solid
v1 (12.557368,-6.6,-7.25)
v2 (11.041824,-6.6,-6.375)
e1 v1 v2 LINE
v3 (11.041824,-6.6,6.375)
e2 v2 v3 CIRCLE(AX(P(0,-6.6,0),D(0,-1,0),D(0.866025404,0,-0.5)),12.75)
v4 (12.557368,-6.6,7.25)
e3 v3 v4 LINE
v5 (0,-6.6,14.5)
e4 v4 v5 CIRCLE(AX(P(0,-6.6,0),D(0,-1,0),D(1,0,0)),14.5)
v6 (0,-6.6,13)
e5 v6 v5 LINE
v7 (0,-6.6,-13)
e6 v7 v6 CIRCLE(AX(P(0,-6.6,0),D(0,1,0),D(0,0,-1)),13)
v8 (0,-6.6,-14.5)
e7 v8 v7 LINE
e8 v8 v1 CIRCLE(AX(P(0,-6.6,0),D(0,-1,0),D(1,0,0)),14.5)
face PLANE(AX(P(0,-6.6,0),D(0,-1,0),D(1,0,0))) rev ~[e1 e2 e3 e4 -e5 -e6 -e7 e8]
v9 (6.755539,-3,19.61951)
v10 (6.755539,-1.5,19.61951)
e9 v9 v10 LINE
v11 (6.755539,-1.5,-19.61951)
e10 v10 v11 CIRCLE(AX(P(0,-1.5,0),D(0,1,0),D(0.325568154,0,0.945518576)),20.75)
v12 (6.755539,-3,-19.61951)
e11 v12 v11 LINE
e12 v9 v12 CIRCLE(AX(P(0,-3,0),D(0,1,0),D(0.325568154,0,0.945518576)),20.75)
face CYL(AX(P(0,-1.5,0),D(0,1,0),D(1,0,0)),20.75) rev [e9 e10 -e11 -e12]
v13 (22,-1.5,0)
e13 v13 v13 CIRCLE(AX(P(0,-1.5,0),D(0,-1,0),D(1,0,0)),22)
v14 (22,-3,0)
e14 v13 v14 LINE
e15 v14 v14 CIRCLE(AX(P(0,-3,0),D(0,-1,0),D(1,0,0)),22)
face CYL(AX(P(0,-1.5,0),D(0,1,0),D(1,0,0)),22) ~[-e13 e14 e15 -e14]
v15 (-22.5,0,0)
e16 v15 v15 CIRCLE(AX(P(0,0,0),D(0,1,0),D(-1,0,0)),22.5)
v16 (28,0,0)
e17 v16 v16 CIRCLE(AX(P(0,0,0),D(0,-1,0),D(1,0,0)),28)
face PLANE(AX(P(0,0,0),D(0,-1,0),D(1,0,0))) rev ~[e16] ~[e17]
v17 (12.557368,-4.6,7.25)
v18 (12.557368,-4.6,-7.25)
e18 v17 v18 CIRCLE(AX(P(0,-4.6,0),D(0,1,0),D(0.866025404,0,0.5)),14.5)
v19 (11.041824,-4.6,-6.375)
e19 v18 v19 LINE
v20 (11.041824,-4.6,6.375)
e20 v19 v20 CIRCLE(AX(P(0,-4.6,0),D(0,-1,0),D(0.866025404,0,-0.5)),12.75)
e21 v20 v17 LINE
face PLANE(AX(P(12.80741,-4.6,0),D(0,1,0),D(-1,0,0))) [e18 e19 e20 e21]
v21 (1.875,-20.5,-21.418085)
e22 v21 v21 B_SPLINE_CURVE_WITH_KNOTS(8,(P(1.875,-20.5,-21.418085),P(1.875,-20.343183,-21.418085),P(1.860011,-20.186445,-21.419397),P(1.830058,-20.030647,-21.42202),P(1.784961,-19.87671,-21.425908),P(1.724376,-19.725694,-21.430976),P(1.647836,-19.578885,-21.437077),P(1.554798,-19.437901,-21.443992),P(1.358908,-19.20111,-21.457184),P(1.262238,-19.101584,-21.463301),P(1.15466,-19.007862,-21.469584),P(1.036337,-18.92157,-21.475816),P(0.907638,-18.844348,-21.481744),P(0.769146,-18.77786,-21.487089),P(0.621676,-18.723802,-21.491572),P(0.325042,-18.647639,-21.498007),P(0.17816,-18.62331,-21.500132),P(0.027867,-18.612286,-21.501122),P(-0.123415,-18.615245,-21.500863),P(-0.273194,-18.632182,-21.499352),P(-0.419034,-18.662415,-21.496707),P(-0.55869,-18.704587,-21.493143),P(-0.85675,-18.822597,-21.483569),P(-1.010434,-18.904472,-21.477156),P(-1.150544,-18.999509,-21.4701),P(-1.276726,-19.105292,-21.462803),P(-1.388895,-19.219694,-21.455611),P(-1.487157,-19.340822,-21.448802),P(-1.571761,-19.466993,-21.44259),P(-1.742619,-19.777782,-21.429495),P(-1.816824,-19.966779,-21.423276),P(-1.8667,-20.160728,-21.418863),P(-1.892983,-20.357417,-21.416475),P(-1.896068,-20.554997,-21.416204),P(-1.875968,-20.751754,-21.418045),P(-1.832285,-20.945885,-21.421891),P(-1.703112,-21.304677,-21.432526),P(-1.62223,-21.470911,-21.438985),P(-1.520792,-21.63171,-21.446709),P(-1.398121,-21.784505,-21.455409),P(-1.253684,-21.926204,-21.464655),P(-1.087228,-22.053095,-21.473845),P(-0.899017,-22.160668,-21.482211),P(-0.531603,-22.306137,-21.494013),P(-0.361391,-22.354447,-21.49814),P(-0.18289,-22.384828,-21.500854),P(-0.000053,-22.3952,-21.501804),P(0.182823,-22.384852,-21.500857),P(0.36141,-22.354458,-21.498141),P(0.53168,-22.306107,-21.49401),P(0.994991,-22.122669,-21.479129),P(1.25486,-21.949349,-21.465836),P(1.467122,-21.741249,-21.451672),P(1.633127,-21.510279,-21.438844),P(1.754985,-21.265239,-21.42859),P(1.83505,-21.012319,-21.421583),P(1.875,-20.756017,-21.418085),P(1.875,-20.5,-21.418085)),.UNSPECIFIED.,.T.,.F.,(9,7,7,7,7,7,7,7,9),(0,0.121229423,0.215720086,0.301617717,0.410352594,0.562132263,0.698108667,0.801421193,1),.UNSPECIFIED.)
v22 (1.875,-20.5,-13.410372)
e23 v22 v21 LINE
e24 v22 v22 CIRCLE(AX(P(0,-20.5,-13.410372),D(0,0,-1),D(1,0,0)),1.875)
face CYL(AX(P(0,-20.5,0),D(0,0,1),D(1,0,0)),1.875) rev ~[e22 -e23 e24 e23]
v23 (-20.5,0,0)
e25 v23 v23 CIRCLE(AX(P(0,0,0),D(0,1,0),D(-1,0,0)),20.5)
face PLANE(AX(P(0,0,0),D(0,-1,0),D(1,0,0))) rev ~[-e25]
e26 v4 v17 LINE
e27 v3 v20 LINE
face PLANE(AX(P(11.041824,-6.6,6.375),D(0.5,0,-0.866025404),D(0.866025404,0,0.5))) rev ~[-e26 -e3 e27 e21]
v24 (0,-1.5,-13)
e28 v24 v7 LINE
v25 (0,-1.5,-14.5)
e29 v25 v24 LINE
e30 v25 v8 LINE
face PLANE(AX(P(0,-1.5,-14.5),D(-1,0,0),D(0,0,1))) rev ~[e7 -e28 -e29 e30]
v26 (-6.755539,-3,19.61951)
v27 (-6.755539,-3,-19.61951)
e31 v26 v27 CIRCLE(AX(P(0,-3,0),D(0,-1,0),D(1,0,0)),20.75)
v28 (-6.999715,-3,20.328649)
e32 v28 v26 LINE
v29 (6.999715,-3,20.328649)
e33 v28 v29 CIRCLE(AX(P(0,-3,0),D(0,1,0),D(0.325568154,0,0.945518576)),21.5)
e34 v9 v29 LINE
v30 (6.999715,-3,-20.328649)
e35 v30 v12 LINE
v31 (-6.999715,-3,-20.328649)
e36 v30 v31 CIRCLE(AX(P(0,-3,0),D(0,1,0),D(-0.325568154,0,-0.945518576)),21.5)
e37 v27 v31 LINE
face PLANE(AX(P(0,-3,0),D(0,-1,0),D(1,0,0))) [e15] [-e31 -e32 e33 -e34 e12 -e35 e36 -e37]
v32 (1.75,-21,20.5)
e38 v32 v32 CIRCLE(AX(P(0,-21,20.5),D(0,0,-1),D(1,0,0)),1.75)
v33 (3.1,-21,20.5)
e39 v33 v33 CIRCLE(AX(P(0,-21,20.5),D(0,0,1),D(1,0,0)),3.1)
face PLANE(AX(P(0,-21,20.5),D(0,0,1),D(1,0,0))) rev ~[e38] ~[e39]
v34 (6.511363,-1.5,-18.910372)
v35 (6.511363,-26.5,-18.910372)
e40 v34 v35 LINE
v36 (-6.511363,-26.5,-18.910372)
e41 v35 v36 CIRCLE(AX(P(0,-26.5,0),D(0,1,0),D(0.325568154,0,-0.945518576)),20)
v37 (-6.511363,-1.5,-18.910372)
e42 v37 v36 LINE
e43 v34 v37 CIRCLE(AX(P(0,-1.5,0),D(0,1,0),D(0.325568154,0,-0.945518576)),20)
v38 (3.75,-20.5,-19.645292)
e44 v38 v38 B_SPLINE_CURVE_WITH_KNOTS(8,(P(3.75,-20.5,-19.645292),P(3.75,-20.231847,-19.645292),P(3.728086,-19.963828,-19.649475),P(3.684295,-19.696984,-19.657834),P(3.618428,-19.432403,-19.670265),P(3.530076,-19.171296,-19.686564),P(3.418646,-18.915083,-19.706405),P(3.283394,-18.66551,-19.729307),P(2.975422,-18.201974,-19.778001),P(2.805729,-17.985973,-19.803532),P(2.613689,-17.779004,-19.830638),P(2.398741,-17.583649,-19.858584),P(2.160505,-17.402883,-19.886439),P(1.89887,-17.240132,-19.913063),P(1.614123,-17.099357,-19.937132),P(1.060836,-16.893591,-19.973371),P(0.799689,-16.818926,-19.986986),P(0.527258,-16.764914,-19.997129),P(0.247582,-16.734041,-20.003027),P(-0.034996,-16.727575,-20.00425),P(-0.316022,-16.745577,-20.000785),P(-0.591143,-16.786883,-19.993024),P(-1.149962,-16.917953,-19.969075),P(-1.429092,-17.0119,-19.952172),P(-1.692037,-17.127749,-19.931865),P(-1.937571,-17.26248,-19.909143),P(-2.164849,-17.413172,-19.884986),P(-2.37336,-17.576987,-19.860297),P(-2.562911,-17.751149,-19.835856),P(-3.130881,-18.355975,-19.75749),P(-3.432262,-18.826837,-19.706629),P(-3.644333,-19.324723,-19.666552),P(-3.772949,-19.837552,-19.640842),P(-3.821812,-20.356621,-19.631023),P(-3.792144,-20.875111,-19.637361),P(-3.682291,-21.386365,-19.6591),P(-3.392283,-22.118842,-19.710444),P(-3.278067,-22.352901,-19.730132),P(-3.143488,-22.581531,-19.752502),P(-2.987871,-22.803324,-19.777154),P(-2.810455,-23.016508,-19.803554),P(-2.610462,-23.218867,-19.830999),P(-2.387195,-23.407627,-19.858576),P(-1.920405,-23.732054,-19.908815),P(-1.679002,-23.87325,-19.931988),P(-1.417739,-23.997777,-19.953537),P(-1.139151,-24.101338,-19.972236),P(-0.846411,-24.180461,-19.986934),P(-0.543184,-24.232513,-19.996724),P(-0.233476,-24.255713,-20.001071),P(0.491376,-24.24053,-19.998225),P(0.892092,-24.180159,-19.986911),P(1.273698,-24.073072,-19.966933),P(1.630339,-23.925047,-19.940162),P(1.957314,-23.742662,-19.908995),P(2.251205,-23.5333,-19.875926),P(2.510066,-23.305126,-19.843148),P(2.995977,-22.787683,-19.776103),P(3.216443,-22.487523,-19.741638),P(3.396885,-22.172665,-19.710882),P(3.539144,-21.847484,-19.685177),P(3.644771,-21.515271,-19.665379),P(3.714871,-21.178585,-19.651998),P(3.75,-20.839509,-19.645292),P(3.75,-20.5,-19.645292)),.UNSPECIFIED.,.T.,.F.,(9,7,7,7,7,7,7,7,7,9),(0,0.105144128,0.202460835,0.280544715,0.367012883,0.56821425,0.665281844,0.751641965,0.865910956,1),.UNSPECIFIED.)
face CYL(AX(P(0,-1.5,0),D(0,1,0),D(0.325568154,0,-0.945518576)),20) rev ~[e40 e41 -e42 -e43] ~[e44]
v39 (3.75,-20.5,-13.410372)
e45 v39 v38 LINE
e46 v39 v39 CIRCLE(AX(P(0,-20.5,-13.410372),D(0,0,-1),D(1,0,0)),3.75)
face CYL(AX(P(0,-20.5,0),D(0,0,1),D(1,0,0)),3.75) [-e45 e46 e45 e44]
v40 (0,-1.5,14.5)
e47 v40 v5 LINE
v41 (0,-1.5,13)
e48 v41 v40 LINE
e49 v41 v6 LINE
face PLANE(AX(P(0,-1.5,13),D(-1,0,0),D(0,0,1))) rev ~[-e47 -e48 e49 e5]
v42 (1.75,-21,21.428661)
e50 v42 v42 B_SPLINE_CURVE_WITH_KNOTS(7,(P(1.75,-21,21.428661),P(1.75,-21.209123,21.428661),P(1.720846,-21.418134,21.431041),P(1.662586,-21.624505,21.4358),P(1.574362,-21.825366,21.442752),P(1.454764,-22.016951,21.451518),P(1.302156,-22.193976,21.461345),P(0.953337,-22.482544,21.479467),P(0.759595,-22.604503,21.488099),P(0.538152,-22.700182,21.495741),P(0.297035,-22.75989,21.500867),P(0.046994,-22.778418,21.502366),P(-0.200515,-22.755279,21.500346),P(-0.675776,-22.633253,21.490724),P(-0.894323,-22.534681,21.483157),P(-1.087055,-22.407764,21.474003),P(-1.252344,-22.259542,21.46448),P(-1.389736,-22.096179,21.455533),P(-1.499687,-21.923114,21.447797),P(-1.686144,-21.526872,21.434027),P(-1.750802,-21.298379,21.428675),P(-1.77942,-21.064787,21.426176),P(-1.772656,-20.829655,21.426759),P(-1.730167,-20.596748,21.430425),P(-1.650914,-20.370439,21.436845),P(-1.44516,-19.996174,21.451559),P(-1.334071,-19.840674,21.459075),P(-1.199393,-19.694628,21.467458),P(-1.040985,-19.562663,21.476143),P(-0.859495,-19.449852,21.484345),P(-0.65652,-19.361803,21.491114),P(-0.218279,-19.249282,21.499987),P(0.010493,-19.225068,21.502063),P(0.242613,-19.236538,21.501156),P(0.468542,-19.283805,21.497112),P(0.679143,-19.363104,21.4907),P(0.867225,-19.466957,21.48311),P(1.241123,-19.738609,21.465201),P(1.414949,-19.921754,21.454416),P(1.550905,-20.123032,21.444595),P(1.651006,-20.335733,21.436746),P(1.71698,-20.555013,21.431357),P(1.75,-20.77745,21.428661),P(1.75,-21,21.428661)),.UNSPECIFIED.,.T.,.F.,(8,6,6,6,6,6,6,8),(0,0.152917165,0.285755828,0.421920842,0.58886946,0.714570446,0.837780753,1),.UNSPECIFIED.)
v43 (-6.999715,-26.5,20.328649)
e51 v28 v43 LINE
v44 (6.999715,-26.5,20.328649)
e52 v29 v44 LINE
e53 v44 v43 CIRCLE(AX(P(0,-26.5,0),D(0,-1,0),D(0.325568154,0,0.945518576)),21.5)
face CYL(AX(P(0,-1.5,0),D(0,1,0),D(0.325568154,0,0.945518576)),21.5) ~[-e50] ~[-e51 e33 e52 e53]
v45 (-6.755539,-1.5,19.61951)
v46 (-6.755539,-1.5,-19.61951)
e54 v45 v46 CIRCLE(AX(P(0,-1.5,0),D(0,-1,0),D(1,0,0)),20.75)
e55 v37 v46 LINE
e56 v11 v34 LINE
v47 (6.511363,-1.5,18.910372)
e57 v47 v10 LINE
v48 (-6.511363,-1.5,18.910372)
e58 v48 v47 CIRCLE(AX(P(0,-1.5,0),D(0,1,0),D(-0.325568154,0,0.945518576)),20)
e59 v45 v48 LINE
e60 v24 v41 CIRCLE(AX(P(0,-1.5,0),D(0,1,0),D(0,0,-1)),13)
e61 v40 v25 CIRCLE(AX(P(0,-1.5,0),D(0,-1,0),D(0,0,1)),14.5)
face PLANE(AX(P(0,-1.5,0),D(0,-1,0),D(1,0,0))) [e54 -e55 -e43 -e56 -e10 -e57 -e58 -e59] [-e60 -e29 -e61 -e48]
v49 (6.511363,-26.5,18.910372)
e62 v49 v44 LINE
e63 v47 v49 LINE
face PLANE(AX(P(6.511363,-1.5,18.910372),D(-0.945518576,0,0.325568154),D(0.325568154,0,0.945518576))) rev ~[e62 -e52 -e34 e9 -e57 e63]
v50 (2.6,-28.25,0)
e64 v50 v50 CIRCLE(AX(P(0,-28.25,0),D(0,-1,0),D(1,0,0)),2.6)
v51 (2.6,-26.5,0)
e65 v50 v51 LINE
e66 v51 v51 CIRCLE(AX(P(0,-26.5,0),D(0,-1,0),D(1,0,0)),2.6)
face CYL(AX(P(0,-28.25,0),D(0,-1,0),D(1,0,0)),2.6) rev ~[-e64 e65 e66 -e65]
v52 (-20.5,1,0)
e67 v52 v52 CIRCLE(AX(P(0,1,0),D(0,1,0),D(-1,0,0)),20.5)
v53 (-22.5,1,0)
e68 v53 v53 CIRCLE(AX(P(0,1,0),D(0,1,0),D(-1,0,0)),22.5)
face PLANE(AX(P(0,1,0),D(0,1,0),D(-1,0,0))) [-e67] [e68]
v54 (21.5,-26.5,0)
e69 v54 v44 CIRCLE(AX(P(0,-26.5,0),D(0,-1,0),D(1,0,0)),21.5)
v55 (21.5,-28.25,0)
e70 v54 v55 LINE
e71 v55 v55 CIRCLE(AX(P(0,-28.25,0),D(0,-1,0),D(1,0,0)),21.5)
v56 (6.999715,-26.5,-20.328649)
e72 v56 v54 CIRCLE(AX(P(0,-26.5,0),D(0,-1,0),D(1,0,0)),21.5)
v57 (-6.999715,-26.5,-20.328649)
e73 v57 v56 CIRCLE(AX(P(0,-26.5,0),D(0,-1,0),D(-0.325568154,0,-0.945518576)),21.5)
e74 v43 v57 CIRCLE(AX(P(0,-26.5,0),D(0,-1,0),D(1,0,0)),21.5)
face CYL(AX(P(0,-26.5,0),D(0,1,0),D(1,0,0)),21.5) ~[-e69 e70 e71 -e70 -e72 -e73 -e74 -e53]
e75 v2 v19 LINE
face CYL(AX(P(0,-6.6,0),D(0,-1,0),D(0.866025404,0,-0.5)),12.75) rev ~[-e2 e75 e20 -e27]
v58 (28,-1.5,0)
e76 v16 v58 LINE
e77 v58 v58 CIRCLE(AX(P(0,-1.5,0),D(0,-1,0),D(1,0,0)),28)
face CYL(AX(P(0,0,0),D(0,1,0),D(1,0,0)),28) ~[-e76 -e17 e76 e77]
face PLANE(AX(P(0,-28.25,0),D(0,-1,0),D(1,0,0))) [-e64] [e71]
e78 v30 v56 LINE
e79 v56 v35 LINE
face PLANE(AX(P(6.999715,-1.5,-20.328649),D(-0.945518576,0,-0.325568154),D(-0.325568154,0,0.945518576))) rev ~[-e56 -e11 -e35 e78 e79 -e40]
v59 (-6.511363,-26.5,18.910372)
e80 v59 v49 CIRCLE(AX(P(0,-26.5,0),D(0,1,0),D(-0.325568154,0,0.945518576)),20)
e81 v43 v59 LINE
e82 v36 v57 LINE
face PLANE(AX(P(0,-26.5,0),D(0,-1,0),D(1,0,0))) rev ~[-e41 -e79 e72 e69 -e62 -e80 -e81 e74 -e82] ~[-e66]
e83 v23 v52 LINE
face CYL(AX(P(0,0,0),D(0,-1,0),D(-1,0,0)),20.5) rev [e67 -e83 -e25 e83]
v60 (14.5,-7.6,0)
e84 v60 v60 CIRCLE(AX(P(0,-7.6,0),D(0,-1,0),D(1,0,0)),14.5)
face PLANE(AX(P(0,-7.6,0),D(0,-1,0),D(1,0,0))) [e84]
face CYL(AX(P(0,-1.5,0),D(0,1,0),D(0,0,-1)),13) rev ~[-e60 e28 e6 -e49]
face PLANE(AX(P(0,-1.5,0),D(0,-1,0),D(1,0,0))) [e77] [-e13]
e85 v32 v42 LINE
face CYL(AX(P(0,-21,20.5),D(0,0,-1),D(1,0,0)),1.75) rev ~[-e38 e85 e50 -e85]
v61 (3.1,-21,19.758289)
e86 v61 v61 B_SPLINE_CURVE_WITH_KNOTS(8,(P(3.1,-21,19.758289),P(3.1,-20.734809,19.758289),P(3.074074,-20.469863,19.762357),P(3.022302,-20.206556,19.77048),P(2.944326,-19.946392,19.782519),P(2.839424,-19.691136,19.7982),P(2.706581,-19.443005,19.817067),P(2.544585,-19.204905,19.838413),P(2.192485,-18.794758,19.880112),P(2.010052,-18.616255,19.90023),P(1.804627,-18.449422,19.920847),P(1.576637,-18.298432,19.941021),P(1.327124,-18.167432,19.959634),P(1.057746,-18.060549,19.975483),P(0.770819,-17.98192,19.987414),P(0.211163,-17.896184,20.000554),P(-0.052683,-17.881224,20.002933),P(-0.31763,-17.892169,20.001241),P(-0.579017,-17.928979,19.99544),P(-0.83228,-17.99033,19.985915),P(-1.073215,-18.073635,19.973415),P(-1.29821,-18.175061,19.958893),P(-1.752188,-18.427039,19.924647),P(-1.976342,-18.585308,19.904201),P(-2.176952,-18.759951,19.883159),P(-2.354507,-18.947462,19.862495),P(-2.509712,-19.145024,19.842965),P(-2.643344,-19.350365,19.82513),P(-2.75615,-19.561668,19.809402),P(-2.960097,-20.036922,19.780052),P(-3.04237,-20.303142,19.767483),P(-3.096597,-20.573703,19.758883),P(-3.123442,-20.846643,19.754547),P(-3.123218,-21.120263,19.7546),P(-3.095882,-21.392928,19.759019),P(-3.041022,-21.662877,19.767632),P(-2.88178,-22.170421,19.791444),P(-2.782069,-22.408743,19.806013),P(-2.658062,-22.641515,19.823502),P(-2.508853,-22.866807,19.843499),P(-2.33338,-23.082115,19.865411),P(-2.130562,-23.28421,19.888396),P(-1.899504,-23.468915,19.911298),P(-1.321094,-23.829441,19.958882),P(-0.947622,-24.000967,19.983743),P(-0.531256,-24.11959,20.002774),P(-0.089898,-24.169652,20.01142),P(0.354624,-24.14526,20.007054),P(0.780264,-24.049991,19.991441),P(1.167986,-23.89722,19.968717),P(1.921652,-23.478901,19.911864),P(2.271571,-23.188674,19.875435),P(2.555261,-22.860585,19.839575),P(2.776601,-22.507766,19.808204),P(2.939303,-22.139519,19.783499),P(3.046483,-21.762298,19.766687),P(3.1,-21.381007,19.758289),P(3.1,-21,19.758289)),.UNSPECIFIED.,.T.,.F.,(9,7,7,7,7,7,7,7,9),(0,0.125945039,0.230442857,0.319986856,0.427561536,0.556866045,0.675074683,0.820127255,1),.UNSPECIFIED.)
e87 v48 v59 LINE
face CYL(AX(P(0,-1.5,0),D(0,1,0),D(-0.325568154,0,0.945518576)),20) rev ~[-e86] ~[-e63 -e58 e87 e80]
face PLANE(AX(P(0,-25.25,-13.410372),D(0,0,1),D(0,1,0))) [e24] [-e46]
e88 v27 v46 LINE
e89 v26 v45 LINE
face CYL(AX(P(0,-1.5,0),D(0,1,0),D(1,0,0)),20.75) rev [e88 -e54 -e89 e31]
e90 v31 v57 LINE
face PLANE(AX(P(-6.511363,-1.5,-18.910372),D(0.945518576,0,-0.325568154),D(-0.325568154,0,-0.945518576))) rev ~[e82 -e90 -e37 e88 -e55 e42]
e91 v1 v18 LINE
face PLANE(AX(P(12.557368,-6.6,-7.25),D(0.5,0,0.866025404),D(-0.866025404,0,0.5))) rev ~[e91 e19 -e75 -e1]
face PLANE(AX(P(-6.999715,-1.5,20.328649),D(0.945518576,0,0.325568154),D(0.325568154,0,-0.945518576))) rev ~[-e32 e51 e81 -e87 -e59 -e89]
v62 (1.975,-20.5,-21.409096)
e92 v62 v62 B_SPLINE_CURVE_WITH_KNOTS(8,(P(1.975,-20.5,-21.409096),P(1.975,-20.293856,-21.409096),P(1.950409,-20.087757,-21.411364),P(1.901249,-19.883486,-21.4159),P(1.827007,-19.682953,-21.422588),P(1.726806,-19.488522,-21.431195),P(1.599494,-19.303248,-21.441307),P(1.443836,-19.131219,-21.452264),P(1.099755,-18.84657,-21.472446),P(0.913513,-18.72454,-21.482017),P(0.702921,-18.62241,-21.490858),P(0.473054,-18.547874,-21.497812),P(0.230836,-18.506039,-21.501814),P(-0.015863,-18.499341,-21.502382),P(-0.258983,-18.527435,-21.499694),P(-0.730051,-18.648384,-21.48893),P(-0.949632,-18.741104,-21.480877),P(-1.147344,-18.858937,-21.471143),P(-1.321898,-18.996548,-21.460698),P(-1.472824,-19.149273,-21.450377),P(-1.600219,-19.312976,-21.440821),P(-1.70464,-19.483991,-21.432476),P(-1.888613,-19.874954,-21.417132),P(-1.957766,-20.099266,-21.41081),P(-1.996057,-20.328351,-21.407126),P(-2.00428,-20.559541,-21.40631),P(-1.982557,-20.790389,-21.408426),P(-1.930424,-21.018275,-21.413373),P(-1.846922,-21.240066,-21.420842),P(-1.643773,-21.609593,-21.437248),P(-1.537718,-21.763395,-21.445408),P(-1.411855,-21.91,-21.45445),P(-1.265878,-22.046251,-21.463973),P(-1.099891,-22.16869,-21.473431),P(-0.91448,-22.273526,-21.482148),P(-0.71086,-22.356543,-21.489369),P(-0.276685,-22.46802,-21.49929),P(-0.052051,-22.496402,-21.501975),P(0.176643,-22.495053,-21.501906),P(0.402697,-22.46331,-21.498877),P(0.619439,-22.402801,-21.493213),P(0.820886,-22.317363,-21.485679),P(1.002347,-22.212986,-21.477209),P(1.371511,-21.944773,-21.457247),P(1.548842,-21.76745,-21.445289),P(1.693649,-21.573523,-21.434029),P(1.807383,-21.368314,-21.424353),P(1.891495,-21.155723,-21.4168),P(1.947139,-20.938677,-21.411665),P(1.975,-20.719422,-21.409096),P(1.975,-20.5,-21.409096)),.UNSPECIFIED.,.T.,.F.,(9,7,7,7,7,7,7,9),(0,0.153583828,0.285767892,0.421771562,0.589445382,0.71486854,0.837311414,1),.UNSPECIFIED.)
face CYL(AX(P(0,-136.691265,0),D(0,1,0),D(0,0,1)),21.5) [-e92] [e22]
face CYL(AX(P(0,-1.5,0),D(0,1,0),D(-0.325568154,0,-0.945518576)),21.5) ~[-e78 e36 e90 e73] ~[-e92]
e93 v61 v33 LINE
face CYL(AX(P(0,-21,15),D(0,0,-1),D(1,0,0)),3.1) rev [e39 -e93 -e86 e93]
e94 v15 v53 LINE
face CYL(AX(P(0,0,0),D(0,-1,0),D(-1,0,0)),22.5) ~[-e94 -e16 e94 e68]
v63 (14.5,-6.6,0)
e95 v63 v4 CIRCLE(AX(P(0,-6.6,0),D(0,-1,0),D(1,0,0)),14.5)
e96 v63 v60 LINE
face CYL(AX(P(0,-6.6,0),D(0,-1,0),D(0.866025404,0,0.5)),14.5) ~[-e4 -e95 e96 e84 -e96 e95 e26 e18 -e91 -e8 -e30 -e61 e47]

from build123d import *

# Parameters (mm, degrees)
F0_R           = 28
F1_DEPTH       = 1.5
F3_DEPTH       = 5.1
F5_DEPTH       = 25
F6_R           = 21.5
F7_DEPTH       = 1.75
F8_R           = 2.6
F9_DEPTH       = 25
F10_R          = 1.975
F11_DEPTH      = 30
F13_END_RADIUS = 21.5
F12_R          = 3.75
F12_R_2        = 1.875
F13_REACH      = 38.6076017178
F14_W          = 15
F14_H          = 26.820743024
F15_DEPTH      = 25
F15_DEPTH_BACK = 25
F16_R          = 14.5
F17_DEPTH      = 1
F19_DEPTH      = 2
F21_R          = 22.5
F21_R_2        = 20.5
F22_DEPTH      = 1
F23_R          = 22
F23_R_2        = 20.75
F24_DEPTH      = 1.5
F25_R          = 3.1
F26_DEPTH      = 5.5
F27_R          = 1.75
F28_REACH      = 12.4507474683
F29_R          = 30
F29_R_2        = 29
F30_DEPTH      = 25


with BuildPart() as f1:
    # F0 (on Front) → F1 (new body)
    with BuildSketch(Plane.XZ):
        Circle(F0_R)
    extrude(amount=F1_DEPTH)

    # F2 (on face) → F3 (join)
    with BuildSketch(Plane.XZ.offset(1.5)):
        with BuildLine():
            ThreePointArc((0, -13), (-13, 0), (0, 13))
            Line((0, 13), (0, 14.5))
            ThreePointArc((0, 14.5), (-14.5, 0), (0, -14.5))
            Line((0, -14.5), (0, -13))
        make_face()
    extrude(amount=F3_DEPTH)

    # F4 (on face) → F5 (join)
    with BuildSketch(Plane.XZ.offset(1.5)):
        with BuildLine():
            Line((6.5113630891, 18.910371512), (6.9997153208, 20.3286493754))
            ThreePointArc((6.9997153208, 20.3286493754), (0, 21.5), (-6.9997153208, 20.3286493754))
            Line((-6.9997153208, 20.3286493754), (-6.5113630891, 18.910371512))
            ThreePointArc((-6.5113630891, 18.910371512), (0, 20), (6.5113630891, 18.910371512))
        make_face()
        with BuildLine():
            ThreePointArc((6.5113630891, -18.910371512), (0, -20), (-6.5113630891, -18.910371512))
            Line((-6.5113630891, -18.910371512), (-6.9997153208, -20.3286493754))
            ThreePointArc((-6.9997153208, -20.3286493754), (0, -21.5), (6.9997153208, -20.3286493754))
            Line((6.9997153208, -20.3286493754), (6.5113630891, -18.910371512))
        make_face()
    extrude(amount=F5_DEPTH)

    # F6 (on face) → F7 (join)
    with BuildSketch(Plane.XZ.offset(26.5)):
        Circle(F6_R)
    extrude(amount=F7_DEPTH)

    # F8 (on face) → F9 (cut)
    with BuildSketch(Plane.XZ.offset(28.25)):
        Circle(F8_R)
    extrude(amount=-F9_DEPTH, mode=Mode.SUBTRACT)

    # F10 (on Top) → F11 (cut)
    with BuildSketch(Plane.XY):
        with Locations((0, -20.5)):
            Circle(F10_R)
    extrude(amount=-F11_DEPTH, mode=Mode.SUBTRACT)

    f13_end = (Plane.ZX.offset(-14) * Cylinder(F13_END_RADIUS, 245.3825308212, mode=Mode.PRIVATE)).faces().sort_by_distance((0, -14, -21.5))[0]
    # F12 (on Top) → F13 (join, up to the whole of a round face its end follows)
    with BuildSketch(Plane.XY):
        with Locations((0, -20.5)):
            Circle(F12_R)
        with Locations((0, -20.5)):
            Circle(F12_R_2, mode=Mode.SUBTRACT)
    f13_long = extrude(amount=-F13_REACH, mode=Mode.PRIVATE)
    add(split(f13_long, bisect_by=f13_end, keep=Keep.BOTTOM, mode=Mode.PRIVATE))

    # F14 (on Right) → F15 (cut, two sides)
    with BuildSketch(Plane.YZ) as f15_sk:
        with Locations((-17.75, 0)):
            Rectangle(F14_W, F14_H)
    extrude(amount=-F15_DEPTH, mode=Mode.SUBTRACT)
    extrude(f15_sk.sketch, amount=F15_DEPTH_BACK, mode=Mode.SUBTRACT)

    # F16 (on face) → F17 (join)
    with BuildSketch(Plane.XZ.offset(6.6)):
        Circle(F16_R)
    extrude(amount=F17_DEPTH)

    # F18 (on face) → F19 (join)
    with BuildSketch(Plane(origin=(0, -6.6, 0), x_dir=(-1, 0, 0), z_dir=(0, 1, 0))):
        with BuildLine():
            Line((-11.0418238983, 6.375), (-12.5573683549, 7.25))
            ThreePointArc((-12.5573683549, 7.25), (-14.5, 0), (-12.5573683549, -7.25))
            Line((-12.5573683549, -7.25), (-11.0418238983, -6.375))
            ThreePointArc((-11.0418238983, -6.375), (-12.75, 0), (-11.0418238983, 6.375))
        make_face()
    extrude(amount=F19_DEPTH)

    # F21 (on face) → F22 (join)
    with BuildSketch(Plane(origin=(0, 0, 0), x_dir=(-1, 0, 0), z_dir=(0, 1, 0))):
        Circle(F21_R)
        Circle(F21_R_2, mode=Mode.SUBTRACT)
    extrude(amount=F22_DEPTH)

    # F23 (on face) → F24 (join)
    with BuildSketch(Plane.XZ.offset(1.5)):
        Circle(F23_R)
        Circle(F23_R_2, mode=Mode.SUBTRACT)
    extrude(amount=F24_DEPTH)

    # F25 (on offset) → F26 (cut)
    with BuildSketch(Plane.XY.offset(15)):
        with Locations((0, -21)):
            Circle(F25_R)
    extrude(amount=F26_DEPTH, mode=Mode.SUBTRACT)

    f28_end = f1.faces().sort_by_distance((17.5034836447, -27.1584498842, 12.4851135478))[0]
    # F27 (on face) → F28 (cut, up to a face of the model that its end follows)
    with BuildSketch(Plane(origin=(0, 0, 20.5), x_dir=(1, 0, 0), z_dir=(0, 0, -1))):
        with Locations((0, 21)):
            Circle(F27_R)
    f28_long = extrude(amount=-F28_REACH, mode=Mode.PRIVATE)
    add(split(f28_long, bisect_by=f28_end, keep=Keep.BOTTOM, mode=Mode.PRIVATE), mode=Mode.SUBTRACT)

    # F29 (on face) → F30 (cut)
    with BuildSketch(Plane.XZ.offset(1.5)):
        Circle(F29_R)
        Circle(F29_R_2, mode=Mode.SUBTRACT)
    extrude(amount=F30_DEPTH, mode=Mode.SUBTRACT)


solid = f1.part
